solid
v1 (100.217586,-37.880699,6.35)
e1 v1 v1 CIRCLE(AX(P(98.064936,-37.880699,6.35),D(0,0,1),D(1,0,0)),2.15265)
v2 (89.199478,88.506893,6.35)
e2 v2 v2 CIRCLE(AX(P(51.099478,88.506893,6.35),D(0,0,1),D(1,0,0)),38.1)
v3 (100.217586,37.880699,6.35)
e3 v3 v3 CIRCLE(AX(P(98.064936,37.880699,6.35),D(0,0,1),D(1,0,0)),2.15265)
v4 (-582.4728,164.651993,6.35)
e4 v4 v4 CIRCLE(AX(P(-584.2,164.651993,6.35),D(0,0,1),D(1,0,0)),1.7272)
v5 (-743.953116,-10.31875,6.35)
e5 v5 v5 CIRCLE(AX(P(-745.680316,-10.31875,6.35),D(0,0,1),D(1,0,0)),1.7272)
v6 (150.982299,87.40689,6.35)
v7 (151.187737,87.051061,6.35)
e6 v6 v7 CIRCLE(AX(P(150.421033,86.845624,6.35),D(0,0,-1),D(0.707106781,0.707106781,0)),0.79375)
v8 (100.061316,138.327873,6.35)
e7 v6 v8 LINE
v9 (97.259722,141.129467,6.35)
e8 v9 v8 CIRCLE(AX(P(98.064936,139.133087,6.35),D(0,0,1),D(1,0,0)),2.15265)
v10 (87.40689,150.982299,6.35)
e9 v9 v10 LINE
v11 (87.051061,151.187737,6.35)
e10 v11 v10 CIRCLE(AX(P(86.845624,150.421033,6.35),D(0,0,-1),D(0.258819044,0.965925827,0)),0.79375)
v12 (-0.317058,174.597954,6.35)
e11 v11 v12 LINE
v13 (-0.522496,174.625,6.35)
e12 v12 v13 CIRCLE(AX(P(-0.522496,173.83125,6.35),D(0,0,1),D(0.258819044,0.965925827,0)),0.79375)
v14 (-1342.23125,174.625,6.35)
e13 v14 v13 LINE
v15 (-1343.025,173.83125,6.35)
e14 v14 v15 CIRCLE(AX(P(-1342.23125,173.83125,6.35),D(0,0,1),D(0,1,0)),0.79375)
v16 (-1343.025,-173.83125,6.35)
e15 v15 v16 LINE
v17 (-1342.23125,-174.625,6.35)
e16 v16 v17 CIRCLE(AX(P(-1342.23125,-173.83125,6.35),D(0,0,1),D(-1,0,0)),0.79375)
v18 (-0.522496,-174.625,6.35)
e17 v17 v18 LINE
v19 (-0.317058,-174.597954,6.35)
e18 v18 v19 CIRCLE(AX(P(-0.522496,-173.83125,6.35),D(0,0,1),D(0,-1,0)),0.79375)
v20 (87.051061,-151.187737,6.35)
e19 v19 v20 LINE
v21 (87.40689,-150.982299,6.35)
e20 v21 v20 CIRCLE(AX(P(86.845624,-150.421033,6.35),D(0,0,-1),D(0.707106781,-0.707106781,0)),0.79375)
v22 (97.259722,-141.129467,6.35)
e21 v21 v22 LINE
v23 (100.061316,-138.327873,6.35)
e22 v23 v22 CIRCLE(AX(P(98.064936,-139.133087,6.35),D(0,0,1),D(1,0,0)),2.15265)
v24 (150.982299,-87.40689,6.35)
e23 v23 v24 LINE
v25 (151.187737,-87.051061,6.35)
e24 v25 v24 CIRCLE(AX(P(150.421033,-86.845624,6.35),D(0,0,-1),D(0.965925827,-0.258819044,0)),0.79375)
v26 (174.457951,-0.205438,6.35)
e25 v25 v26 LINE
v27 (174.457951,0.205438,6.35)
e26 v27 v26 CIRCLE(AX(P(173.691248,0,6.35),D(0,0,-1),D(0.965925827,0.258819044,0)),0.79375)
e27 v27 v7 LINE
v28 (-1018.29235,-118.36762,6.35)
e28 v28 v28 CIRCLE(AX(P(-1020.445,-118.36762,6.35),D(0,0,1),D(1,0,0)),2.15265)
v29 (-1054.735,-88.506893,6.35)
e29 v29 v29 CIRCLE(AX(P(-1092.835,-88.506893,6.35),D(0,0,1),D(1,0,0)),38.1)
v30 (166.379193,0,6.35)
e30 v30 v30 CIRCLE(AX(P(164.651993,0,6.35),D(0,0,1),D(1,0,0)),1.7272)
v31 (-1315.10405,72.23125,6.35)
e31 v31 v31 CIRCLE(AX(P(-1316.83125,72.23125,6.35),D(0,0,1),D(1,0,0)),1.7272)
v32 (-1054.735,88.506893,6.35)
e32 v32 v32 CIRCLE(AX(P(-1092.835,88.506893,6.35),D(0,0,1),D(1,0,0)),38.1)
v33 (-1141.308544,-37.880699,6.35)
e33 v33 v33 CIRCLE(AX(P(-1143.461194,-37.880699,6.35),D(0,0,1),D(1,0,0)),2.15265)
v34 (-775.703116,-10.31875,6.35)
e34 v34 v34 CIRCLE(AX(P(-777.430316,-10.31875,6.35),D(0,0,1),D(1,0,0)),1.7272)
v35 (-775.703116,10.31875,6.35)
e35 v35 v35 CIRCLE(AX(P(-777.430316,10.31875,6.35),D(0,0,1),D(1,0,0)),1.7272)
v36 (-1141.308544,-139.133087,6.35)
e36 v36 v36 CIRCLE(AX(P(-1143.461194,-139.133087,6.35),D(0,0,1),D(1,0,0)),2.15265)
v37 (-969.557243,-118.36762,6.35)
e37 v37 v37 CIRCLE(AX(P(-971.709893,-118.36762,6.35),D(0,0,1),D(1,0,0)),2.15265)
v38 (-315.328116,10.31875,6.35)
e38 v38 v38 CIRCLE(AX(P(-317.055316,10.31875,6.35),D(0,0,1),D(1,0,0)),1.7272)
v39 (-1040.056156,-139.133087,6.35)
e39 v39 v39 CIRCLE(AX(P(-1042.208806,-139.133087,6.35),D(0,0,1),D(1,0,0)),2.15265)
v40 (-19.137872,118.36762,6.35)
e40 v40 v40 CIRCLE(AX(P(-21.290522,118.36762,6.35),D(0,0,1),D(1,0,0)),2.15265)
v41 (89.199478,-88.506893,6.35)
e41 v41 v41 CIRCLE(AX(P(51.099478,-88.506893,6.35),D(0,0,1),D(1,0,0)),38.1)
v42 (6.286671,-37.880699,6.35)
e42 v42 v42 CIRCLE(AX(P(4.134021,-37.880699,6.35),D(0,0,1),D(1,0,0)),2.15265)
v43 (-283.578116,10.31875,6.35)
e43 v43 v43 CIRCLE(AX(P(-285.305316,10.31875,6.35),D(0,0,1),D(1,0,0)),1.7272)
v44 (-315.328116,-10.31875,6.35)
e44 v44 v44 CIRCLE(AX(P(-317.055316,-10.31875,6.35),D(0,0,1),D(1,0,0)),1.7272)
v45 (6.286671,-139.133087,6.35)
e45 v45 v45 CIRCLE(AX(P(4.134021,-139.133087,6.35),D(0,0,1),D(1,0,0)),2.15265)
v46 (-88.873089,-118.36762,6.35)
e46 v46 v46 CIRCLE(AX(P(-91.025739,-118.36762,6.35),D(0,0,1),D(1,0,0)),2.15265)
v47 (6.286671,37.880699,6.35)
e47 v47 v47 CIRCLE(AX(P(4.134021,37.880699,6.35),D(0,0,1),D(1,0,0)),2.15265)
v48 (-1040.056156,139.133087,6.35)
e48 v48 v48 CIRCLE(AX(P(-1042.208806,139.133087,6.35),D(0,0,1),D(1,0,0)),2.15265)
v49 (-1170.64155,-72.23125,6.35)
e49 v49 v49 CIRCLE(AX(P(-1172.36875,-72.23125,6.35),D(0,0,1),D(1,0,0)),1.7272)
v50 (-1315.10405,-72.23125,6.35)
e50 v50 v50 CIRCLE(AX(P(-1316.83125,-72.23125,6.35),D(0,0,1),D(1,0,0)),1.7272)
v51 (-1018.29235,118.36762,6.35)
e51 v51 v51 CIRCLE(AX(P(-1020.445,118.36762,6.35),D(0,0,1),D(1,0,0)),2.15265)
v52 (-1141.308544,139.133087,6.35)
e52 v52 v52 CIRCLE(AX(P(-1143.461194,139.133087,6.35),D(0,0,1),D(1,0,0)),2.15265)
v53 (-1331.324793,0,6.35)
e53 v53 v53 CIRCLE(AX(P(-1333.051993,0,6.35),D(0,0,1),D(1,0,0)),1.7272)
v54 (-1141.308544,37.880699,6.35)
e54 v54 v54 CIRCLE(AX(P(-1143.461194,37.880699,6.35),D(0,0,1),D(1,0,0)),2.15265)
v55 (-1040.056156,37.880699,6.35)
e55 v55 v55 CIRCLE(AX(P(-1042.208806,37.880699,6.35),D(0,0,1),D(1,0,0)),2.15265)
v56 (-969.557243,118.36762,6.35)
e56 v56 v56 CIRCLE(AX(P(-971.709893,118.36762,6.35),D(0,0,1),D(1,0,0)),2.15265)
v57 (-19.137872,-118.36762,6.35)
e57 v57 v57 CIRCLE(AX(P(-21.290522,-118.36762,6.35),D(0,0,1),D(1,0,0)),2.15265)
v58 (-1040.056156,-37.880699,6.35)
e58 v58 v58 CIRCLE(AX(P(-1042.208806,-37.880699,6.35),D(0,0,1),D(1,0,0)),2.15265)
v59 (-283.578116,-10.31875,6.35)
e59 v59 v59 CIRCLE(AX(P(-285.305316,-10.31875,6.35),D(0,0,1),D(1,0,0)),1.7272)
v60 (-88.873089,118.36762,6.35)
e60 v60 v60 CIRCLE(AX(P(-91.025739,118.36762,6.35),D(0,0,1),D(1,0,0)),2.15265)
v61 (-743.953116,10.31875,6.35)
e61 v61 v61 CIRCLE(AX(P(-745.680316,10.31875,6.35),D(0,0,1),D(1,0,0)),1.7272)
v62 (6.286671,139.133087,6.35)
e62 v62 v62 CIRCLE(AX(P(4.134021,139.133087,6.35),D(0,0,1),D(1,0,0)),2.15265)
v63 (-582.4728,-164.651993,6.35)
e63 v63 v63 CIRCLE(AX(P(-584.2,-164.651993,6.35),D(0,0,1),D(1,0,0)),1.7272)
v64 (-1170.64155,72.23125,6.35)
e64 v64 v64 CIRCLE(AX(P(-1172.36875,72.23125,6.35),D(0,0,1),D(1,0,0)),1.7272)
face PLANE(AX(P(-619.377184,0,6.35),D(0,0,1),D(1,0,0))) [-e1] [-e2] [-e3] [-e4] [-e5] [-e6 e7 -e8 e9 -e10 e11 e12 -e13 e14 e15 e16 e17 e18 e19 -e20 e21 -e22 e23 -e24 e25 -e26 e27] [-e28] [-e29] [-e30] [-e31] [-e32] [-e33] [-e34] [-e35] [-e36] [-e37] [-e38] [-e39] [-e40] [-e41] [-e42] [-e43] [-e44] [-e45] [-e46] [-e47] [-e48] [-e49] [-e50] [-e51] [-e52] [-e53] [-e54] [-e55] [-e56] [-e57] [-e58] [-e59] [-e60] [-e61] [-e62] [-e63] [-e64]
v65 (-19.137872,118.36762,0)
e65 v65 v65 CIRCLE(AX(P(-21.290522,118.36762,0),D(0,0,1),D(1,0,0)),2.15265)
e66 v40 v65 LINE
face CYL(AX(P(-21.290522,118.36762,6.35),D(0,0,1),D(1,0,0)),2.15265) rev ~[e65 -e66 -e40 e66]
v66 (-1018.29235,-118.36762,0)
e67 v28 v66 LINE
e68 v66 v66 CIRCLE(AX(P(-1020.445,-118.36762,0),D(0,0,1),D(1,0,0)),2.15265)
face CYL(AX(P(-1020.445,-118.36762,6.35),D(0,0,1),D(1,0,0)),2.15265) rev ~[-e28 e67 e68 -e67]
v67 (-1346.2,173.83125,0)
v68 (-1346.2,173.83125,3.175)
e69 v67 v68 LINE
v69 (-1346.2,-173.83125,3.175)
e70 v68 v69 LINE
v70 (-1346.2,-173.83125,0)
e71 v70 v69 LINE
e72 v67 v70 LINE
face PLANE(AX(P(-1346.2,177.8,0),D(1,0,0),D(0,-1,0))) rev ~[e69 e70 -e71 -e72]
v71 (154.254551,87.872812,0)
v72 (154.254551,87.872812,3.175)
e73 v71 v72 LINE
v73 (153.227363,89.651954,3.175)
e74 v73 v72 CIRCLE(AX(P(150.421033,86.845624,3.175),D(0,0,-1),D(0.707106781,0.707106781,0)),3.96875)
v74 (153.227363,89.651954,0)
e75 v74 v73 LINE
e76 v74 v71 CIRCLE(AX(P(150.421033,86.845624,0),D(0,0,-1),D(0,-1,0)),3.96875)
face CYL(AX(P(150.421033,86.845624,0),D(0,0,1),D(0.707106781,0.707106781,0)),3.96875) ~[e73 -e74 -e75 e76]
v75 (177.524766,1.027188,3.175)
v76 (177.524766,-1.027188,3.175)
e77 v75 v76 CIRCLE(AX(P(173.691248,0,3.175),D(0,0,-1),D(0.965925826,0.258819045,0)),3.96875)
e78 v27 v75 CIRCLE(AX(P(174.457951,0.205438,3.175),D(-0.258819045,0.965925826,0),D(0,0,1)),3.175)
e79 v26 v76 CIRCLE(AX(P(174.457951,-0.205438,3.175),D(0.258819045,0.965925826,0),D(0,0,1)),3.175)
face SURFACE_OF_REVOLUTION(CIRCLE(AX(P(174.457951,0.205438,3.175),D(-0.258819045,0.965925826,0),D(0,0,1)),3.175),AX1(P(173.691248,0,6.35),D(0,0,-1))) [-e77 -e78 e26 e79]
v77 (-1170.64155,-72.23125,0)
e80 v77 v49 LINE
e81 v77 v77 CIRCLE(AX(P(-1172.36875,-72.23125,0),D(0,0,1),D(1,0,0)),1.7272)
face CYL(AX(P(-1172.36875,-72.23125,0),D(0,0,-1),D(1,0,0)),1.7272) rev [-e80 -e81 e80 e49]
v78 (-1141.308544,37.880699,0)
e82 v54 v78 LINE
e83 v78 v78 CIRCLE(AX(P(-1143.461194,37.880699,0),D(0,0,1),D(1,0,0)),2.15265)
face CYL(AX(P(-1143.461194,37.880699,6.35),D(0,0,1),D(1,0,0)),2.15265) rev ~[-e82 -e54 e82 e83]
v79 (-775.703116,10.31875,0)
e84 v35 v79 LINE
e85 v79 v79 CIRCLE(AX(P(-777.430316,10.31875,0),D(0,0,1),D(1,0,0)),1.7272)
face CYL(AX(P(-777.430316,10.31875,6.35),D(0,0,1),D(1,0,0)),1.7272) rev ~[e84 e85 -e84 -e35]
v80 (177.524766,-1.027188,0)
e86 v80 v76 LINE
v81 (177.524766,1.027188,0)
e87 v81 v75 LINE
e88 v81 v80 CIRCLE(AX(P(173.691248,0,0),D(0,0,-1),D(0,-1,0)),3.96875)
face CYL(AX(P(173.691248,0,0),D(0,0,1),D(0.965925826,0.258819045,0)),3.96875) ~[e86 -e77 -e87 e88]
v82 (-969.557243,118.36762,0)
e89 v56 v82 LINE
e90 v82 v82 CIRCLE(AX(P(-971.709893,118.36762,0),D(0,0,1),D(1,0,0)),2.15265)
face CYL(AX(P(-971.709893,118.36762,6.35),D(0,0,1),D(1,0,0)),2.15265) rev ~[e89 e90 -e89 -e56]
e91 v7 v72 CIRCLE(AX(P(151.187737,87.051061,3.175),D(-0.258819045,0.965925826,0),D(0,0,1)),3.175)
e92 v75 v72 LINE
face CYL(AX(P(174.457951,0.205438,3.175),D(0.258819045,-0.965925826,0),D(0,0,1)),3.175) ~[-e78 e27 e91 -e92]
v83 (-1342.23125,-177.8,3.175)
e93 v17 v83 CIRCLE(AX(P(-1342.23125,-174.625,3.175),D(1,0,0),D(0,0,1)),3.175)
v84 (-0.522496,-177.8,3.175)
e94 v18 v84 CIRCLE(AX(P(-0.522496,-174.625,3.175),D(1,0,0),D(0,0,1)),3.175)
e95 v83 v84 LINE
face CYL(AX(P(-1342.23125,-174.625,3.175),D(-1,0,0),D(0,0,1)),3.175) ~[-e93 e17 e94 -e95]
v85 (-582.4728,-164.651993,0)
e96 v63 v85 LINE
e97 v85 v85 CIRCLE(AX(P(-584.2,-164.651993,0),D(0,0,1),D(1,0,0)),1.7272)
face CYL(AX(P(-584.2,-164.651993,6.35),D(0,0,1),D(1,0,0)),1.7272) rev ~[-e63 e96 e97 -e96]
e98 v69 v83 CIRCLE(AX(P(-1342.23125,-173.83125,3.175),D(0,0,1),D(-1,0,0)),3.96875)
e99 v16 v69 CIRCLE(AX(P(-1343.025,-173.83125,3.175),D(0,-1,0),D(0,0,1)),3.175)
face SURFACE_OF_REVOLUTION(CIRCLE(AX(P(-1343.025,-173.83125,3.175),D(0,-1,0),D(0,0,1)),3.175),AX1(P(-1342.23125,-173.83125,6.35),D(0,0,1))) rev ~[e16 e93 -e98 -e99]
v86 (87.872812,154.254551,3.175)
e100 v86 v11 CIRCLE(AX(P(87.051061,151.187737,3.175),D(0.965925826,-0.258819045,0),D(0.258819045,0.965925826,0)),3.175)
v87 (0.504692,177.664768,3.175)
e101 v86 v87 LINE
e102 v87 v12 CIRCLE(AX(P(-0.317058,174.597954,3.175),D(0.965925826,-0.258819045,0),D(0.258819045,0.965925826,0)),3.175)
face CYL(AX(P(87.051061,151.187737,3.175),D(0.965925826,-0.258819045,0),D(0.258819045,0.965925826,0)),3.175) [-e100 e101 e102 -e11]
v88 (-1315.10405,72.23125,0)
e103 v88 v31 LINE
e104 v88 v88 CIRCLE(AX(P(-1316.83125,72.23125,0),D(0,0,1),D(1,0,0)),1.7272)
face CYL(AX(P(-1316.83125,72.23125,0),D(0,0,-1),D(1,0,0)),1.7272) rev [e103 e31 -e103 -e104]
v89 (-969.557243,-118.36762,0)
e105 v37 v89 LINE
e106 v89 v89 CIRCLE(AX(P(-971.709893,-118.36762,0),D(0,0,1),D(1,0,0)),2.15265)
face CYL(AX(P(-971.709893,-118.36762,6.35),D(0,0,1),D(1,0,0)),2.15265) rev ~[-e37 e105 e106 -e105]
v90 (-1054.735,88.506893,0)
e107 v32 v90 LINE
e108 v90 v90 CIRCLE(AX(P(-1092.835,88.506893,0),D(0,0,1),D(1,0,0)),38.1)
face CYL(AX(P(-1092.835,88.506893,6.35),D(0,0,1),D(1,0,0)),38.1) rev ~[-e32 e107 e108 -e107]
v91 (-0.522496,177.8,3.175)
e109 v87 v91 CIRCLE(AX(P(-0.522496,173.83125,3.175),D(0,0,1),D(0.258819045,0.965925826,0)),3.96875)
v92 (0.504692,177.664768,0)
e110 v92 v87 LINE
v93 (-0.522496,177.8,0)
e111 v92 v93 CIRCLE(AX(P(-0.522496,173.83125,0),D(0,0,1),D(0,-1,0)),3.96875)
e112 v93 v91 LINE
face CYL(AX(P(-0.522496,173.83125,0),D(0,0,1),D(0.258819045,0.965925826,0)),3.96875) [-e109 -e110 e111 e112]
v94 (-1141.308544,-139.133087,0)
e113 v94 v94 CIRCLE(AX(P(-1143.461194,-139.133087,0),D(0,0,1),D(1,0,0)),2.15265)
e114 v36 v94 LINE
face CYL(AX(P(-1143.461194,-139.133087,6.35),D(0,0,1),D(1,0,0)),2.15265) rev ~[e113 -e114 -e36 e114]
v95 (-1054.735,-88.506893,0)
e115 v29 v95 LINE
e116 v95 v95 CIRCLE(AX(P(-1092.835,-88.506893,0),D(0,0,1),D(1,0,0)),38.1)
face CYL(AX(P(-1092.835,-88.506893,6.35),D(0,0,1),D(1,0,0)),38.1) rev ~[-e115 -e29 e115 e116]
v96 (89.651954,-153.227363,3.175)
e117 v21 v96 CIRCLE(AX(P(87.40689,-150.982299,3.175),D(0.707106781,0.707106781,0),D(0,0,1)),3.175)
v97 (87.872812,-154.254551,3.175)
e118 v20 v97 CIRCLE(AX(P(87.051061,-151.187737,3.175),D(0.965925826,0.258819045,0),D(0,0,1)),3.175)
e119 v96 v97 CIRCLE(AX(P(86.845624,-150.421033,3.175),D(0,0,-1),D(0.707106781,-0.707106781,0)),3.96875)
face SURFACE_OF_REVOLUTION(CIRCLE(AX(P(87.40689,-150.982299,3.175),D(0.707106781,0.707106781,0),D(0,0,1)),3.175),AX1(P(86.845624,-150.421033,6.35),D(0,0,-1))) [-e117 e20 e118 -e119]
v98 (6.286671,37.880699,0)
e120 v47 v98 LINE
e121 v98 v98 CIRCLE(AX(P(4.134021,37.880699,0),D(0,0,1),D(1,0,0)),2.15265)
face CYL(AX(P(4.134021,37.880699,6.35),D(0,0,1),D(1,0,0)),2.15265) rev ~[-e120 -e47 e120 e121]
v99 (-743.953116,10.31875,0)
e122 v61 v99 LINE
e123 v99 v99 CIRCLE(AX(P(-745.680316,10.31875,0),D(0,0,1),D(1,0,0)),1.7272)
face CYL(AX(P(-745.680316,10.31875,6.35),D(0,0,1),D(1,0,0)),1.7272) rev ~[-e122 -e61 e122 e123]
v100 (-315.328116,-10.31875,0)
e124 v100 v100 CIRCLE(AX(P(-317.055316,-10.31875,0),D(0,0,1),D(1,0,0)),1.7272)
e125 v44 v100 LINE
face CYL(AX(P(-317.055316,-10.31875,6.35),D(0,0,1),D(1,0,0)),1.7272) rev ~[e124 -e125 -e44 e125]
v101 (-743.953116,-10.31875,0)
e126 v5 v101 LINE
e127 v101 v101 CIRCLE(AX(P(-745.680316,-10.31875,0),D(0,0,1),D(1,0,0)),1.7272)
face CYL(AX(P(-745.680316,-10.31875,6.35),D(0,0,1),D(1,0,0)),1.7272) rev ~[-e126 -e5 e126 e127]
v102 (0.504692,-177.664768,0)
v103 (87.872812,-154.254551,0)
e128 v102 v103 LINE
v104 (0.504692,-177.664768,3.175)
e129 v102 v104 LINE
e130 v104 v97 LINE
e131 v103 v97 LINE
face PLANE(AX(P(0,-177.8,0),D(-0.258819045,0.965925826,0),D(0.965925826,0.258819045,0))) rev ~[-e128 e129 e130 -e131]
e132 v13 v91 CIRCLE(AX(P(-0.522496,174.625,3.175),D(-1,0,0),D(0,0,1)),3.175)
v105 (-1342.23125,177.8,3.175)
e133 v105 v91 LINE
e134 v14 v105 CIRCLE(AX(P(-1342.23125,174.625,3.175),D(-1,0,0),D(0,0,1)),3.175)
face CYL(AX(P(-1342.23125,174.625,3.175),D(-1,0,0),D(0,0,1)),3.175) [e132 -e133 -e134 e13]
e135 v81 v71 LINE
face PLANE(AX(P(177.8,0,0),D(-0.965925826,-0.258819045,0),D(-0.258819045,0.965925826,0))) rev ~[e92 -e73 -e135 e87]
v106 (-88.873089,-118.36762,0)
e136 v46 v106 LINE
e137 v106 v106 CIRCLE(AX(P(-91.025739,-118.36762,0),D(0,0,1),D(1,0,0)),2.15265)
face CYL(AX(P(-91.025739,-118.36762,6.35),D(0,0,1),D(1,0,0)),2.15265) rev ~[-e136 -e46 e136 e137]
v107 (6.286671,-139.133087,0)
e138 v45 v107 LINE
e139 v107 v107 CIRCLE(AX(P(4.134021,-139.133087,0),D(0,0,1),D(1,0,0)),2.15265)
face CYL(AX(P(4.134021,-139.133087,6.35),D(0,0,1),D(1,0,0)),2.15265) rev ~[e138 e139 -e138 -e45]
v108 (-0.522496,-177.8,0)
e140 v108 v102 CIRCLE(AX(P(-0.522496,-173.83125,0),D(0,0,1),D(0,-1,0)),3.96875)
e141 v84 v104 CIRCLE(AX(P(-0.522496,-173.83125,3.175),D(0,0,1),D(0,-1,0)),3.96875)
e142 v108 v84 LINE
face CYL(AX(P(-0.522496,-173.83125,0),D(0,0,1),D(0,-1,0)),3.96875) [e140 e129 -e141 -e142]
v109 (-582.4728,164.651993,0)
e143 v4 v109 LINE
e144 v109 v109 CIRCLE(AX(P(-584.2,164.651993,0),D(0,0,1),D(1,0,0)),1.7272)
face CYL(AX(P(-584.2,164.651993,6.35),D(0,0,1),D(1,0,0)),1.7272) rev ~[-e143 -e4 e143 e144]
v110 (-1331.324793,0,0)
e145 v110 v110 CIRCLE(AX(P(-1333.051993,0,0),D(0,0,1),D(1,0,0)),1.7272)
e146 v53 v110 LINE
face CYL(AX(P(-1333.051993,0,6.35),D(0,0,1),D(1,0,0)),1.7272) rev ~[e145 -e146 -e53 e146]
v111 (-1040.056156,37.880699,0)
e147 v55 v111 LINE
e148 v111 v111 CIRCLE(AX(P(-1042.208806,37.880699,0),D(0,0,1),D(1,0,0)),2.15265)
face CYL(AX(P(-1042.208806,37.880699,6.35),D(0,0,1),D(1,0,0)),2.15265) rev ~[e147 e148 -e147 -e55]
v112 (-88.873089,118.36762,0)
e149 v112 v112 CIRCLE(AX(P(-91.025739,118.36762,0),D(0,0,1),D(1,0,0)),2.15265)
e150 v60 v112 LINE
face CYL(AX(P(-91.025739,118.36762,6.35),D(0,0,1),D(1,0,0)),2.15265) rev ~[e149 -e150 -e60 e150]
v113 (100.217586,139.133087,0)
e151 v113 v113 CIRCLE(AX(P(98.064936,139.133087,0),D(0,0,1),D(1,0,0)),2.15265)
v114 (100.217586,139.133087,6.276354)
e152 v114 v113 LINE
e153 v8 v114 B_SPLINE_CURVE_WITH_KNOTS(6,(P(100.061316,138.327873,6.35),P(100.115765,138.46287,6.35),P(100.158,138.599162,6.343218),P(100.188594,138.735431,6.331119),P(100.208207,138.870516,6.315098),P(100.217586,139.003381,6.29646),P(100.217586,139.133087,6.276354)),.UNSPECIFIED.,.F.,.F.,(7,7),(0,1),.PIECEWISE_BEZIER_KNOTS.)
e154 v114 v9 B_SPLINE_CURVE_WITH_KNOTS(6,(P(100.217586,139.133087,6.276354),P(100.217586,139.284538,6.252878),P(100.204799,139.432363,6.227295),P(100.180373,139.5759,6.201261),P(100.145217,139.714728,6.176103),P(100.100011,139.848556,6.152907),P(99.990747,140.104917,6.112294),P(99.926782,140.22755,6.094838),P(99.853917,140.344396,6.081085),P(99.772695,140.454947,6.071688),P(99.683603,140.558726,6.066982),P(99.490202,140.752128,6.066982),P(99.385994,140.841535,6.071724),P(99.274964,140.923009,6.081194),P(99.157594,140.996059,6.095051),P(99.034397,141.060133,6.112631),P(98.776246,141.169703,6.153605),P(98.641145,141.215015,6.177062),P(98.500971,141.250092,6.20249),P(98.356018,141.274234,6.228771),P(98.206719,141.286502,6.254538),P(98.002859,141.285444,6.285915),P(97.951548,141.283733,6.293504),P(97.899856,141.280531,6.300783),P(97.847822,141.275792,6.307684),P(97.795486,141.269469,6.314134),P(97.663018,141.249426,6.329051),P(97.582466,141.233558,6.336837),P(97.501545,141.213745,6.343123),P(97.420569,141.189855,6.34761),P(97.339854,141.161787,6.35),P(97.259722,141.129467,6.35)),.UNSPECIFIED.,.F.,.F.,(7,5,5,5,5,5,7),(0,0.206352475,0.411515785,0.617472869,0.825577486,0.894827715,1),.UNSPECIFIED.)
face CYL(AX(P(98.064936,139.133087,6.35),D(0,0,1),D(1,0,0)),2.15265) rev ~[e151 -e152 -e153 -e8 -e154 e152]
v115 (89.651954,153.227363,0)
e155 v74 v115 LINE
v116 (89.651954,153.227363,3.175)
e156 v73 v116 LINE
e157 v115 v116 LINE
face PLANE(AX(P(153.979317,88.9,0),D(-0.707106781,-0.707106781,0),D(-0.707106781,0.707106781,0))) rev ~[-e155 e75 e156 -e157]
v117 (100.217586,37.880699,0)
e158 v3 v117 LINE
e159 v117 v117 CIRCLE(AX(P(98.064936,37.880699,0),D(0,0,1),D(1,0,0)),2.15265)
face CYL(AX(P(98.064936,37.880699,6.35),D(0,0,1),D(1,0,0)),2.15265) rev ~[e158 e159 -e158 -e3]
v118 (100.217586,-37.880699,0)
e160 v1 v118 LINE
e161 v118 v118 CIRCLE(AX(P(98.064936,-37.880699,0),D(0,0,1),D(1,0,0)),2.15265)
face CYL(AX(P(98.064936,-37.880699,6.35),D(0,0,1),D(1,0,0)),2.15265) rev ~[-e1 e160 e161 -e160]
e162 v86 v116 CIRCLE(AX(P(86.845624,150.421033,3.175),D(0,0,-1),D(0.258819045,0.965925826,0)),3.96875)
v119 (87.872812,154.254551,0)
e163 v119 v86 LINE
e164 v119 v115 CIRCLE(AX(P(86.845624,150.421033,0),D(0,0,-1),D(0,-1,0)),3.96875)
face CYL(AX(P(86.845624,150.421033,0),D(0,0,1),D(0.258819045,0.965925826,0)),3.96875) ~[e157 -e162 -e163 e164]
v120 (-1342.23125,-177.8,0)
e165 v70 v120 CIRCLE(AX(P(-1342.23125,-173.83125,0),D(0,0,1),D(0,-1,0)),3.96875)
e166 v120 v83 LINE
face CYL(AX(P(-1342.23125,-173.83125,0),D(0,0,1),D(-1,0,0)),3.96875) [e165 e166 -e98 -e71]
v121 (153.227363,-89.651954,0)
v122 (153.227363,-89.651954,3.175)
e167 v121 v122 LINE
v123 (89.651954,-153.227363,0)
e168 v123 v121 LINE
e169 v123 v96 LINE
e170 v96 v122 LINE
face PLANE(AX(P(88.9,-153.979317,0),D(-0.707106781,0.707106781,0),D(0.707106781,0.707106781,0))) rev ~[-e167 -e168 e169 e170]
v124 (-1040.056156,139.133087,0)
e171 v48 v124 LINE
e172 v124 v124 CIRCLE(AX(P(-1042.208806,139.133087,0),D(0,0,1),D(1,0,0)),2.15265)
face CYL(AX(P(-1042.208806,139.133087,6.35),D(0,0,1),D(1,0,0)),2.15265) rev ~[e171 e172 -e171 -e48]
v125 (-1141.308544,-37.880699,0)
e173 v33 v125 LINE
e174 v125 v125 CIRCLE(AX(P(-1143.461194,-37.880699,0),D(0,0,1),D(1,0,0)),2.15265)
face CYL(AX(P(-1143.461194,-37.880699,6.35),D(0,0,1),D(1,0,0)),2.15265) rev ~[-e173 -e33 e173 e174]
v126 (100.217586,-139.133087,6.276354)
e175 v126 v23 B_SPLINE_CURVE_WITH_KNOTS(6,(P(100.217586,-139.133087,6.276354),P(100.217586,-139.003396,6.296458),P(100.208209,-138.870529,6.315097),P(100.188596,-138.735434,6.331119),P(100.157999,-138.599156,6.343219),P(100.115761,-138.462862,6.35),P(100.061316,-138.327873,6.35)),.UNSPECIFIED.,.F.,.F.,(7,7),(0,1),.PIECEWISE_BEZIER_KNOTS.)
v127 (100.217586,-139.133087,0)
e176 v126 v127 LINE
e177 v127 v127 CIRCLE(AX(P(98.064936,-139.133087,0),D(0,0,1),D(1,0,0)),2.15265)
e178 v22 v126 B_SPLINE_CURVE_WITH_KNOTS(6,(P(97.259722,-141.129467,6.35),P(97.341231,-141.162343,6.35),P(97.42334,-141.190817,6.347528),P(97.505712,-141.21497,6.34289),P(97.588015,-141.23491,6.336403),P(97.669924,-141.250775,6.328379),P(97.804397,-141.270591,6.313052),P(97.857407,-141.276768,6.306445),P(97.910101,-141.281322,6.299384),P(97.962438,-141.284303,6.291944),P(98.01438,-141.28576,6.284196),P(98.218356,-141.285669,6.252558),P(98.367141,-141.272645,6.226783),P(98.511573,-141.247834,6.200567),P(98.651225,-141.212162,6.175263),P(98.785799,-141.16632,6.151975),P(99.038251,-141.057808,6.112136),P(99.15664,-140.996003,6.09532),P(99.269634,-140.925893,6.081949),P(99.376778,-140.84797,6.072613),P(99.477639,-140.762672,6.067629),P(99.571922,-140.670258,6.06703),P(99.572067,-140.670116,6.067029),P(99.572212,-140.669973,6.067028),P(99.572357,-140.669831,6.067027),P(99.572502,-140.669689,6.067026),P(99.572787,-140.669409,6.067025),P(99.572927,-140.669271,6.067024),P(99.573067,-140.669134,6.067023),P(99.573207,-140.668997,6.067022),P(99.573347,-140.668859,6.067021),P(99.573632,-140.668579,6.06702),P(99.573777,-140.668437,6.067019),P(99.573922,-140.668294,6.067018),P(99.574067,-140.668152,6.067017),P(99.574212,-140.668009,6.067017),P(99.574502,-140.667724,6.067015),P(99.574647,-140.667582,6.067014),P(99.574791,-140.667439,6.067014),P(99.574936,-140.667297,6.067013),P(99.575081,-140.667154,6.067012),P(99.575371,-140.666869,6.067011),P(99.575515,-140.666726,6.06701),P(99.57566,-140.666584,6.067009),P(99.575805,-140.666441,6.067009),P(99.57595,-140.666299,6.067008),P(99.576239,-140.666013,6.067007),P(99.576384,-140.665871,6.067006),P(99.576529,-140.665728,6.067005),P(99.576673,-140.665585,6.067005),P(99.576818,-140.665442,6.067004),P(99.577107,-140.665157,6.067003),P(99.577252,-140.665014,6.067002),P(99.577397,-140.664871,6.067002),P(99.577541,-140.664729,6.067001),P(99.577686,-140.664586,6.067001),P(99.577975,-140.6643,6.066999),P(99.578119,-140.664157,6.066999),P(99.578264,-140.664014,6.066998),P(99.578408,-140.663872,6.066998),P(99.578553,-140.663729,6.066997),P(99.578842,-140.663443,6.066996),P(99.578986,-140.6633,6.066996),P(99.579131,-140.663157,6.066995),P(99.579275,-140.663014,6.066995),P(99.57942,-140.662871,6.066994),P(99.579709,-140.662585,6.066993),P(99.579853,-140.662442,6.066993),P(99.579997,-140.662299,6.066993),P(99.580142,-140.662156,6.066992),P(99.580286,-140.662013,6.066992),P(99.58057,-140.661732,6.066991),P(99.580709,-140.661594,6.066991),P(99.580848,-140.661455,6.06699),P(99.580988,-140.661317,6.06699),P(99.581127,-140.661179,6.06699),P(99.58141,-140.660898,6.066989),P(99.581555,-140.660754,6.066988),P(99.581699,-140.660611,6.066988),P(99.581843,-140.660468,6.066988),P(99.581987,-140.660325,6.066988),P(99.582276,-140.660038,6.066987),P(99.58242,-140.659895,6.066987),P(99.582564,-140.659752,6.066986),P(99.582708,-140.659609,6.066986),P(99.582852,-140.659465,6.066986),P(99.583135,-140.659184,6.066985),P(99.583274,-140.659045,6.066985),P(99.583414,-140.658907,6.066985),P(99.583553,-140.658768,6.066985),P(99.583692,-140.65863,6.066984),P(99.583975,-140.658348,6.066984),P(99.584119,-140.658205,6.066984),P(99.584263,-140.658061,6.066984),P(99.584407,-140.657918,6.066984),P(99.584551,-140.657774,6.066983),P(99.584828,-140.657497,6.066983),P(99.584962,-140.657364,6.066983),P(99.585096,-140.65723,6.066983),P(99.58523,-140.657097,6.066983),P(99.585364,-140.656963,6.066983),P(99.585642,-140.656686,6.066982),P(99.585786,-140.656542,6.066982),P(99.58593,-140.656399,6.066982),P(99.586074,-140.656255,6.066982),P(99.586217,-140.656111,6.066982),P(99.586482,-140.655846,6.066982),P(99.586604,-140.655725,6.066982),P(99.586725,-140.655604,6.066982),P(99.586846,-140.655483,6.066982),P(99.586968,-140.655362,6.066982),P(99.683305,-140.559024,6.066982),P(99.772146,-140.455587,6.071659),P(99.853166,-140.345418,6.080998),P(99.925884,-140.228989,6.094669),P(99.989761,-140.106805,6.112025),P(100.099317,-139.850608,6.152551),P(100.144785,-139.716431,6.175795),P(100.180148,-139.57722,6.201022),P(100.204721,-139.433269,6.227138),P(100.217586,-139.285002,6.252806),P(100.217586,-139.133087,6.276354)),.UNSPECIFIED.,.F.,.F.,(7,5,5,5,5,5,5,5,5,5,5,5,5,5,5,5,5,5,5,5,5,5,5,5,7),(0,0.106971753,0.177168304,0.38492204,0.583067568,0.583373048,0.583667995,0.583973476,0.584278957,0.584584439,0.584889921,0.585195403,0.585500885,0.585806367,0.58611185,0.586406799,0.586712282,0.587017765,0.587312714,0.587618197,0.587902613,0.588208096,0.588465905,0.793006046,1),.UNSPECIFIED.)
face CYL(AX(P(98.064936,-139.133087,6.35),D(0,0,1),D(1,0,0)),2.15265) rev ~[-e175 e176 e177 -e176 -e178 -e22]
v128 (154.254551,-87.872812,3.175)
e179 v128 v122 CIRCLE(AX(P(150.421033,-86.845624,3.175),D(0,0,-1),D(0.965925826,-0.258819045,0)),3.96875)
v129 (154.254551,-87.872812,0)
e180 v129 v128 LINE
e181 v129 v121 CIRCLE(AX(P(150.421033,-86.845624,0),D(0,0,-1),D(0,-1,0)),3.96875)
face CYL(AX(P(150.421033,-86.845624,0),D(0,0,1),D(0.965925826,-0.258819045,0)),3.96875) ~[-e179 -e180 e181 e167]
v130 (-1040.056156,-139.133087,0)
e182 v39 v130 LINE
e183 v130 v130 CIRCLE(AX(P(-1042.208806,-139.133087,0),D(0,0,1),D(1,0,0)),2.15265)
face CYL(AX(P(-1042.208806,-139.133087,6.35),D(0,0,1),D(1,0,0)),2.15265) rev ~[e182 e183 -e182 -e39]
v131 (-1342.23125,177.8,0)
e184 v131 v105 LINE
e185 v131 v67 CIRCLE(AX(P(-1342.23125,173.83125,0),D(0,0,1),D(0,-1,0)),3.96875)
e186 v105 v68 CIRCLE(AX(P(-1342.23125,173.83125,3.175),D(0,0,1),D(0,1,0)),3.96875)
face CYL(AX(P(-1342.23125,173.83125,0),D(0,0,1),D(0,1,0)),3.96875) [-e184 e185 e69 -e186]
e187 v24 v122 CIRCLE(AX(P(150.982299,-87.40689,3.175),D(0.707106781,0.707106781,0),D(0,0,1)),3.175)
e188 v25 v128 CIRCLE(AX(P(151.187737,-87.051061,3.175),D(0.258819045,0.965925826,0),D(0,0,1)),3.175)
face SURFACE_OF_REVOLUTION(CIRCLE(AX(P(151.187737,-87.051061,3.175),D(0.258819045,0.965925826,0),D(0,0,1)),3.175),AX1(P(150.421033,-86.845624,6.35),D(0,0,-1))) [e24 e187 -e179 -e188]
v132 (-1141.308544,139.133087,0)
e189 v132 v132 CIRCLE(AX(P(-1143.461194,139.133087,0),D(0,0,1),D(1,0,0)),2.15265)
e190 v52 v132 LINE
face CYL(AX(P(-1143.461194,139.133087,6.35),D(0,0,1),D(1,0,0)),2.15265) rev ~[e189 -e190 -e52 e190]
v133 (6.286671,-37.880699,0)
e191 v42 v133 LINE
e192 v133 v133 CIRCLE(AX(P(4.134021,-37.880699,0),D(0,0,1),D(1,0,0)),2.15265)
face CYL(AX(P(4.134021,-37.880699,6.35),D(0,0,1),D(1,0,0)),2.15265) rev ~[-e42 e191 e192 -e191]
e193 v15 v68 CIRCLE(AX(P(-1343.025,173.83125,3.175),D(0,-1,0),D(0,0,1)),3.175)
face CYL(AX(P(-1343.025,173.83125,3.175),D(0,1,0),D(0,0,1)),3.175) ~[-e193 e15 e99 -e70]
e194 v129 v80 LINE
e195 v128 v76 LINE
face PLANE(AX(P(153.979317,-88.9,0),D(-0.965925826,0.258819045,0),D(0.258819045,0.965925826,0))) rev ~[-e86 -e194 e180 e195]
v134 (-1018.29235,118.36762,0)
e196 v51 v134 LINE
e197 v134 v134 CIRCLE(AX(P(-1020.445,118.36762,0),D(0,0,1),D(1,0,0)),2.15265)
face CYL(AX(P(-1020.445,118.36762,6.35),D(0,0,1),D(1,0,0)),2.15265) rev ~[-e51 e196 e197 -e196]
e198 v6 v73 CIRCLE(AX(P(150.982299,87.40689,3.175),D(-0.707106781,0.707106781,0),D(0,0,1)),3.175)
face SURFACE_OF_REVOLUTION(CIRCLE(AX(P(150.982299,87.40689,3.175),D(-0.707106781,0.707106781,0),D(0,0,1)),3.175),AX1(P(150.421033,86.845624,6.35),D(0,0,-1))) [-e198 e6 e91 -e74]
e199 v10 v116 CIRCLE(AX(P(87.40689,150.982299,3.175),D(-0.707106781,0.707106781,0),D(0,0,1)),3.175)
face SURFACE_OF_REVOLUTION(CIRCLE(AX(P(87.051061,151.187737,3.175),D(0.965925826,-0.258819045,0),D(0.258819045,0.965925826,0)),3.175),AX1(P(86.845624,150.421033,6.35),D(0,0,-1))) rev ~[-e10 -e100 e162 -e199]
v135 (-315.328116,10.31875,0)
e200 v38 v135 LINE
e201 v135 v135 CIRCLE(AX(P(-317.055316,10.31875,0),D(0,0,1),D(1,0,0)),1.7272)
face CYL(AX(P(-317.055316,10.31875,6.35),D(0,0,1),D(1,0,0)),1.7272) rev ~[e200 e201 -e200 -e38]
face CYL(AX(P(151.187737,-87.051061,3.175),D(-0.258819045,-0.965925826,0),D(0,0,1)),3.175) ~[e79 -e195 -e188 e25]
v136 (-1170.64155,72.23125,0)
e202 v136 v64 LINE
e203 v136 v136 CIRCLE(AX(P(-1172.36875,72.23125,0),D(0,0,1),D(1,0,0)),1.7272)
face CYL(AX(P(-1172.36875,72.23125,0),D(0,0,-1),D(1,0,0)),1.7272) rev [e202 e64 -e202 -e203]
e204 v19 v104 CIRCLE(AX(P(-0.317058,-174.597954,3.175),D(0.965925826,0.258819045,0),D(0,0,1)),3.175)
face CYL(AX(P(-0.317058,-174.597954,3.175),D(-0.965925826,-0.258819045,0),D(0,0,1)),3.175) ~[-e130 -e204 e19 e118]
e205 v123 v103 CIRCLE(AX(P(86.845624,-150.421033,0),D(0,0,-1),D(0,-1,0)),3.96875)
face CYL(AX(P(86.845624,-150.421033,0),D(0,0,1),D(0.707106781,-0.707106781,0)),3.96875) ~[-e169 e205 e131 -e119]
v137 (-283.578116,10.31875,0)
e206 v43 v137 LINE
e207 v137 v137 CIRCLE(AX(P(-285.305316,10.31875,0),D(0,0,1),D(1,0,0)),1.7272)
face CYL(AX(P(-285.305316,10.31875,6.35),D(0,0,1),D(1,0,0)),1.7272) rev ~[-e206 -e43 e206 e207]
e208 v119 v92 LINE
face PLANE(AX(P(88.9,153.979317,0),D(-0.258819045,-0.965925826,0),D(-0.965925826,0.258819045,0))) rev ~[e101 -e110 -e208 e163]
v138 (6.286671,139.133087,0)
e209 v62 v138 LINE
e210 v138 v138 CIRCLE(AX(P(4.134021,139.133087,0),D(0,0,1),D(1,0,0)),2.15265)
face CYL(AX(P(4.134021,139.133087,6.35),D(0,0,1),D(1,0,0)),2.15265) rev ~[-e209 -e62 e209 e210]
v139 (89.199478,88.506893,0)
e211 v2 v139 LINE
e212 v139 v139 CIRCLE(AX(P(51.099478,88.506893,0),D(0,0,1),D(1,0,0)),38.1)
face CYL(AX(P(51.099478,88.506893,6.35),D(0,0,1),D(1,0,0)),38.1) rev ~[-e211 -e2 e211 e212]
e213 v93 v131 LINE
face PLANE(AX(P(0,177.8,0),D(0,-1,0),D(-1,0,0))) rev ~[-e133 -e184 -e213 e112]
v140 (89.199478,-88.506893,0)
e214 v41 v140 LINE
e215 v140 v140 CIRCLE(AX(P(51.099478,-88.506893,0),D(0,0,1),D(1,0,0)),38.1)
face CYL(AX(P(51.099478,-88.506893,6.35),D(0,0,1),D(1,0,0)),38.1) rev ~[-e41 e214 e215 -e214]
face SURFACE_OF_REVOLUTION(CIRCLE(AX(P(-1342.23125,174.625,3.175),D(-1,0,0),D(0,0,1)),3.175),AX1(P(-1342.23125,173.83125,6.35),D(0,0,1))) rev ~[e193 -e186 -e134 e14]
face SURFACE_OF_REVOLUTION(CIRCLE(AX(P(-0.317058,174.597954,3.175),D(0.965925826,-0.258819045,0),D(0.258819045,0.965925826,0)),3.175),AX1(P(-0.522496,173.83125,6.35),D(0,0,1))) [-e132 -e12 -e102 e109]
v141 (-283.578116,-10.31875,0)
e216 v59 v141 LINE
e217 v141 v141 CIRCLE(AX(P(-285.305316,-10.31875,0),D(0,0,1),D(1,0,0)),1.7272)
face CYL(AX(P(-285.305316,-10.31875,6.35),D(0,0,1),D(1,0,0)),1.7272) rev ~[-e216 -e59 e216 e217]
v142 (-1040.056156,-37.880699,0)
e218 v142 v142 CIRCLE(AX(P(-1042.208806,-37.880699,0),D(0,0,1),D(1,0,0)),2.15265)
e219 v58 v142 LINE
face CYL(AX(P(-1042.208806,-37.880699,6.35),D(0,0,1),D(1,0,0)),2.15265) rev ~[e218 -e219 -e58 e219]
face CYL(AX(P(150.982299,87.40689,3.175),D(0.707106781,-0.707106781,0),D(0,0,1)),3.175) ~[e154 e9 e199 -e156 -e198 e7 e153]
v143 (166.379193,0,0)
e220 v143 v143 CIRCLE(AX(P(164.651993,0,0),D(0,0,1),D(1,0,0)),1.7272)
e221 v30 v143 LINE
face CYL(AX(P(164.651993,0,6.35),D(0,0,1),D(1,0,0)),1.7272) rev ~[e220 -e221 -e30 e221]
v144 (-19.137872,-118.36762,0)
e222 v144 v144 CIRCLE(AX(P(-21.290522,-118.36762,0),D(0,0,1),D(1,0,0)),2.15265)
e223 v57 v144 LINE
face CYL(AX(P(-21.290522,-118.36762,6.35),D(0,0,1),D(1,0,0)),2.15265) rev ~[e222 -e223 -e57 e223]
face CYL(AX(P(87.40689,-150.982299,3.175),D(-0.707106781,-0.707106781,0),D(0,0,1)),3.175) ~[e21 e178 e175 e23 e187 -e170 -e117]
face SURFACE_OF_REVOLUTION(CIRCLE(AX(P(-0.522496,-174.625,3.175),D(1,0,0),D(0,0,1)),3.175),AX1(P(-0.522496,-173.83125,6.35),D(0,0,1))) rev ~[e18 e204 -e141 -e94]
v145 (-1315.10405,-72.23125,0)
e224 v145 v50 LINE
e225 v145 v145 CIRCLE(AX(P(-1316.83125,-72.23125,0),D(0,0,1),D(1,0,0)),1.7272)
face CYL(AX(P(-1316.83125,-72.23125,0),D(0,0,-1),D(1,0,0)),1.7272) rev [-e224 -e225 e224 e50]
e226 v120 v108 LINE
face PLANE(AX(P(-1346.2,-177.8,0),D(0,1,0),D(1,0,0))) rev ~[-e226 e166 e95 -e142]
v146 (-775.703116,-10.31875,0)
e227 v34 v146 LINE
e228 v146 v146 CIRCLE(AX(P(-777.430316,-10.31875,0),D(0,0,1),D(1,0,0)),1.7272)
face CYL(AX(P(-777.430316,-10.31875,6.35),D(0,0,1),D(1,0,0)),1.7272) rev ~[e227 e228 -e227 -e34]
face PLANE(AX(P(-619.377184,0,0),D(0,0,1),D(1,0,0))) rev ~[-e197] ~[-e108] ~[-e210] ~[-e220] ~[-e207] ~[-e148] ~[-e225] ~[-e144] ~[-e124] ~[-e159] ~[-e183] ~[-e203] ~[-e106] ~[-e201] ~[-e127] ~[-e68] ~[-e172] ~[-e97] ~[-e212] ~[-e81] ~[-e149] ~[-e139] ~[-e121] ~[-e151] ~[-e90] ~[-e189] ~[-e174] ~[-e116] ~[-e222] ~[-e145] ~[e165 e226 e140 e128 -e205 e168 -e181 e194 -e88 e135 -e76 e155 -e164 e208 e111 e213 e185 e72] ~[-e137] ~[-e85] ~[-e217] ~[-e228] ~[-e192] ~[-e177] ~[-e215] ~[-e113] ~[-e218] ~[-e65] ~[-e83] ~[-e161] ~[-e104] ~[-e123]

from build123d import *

# Parameters (mm, degrees)
F0_R         = 1.7272
F1_DEPTH     = 6.35
F2_R         = 1.7272
F2_R_2       = 38.1
F2_R_3       = 2.15265
F3_DEPTH     = 6.35
F4_R         = 1.7272
F4_R_2       = 2.15265
F5_DEPTH     = 6.35
F6_R         = 3.96875
F7_T1_DEPTH  = 90.4501332312
F7_T3_DEPTH  = 89.9092057235
F7_T5_DEPTH  = 1341.7087541502
F7_T7_DEPTH  = 89.9092057235
F7_T9_DEPTH  = 347.6625
F7_T11_DEPTH = 89.9092057235
F7_T13_DEPTH = 89.9092057235
F7_T15_DEPTH = 90.4501332312
F7_T18_ANGLE = 90
F7_T20_ANGLE = 30
F7_T22_ANGLE = 15
F7_T24_ANGLE = 30
F7_T26_ANGLE = 90
F7_T28_ANGLE = 30
F7_T30_ANGLE = 30
F7_T32_ANGLE = 15
F7_T34_ANGLE = 30


# Not quite as in the source:
# - a fillet or chamfer that OpenCascade refuses, or shapes differently, is made with other operations: its cross-section is extruded or revolved along the edge and cut away or added


with BuildPart() as f1:
    # F0 (on Top) → F1 (new body)
    with BuildSketch(Plane.XY):
        Polygon((88.9, 153.9793167929), (0, 177.8), (-1346.2, 177.8), (-1346.2, -177.8), (0, -177.8), (88.9, -153.9793167929), (153.9793167929, -88.9), (177.8, 0), (153.9793167929, 88.9), align=None)
        with Locations((-1316.83125, -72.23125)):
            Circle(F0_R, mode=Mode.SUBTRACT)
        with Locations((-1172.36875, -72.23125)):
            Circle(F0_R, mode=Mode.SUBTRACT)
        with Locations((-1316.83125, 72.23125)):
            Circle(F0_R, mode=Mode.SUBTRACT)
        with Locations((-1172.36875, 72.23125)):
            Circle(F0_R, mode=Mode.SUBTRACT)
    extrude(amount=F1_DEPTH)

    # F2 (on face) → F3 (cut, through all)
    with BuildSketch(Plane.XY.offset(6.35)):
        with Locations((-1333.0519925088, 0)):
            Circle(F2_R)
        with Locations((-584.2, 164.6519925088)):
            Circle(F2_R)
        with Locations((-584.2, -164.6519925088)):
            Circle(F2_R)
        with Locations((164.6519925088, 0)):
            Circle(F2_R)
        with Locations((51.0994784628, 88.5068929378)):
            Circle(F2_R_2)
        with Locations((51.0994784628, -88.5068929378)):
            Circle(F2_R_2)
        with Locations((-1092.835, 88.5068929378)):
            Circle(F2_R_2)
        with Locations((-1092.835, -88.5068929378)):
            Circle(F2_R_2)
        with Locations((4.1340214009, -139.1330868203)):
            Circle(F2_R_3)
        with Locations((98.0649355247, -139.1330868203)):
            Circle(F2_R_3)
        with Locations((98.0649355247, -37.8806990553)):
            Circle(F2_R_3)
        with Locations((4.1340214009, -37.8806990553)):
            Circle(F2_R_3)
        with Locations((4.1340214009, 37.8806990553)):
            Circle(F2_R_3)
        with Locations((4.1340214009, 139.1330868203)):
            Circle(F2_R_3)
        with Locations((98.0649355247, 139.1330868203)):
            Circle(F2_R_3)
        with Locations((98.0649355247, 37.8806990553)):
            Circle(F2_R_3)
        with Locations((-1143.4611938825, -139.1330868203)):
            Circle(F2_R_3)
        with Locations((-1042.2088061175, -139.1330868203)):
            Circle(F2_R_3)
        with Locations((-1042.2088061175, -37.8806990553)):
            Circle(F2_R_3)
        with Locations((-1143.4611938825, -37.8806990553)):
            Circle(F2_R_3)
        with Locations((-1143.4611938825, 37.8806990553)):
            Circle(F2_R_3)
        with Locations((-1042.2088061175, 37.8806990553)):
            Circle(F2_R_3)
        with Locations((-1042.2088061175, 139.1330868203)):
            Circle(F2_R_3)
        with Locations((-1143.4611938825, 139.1330868203)):
            Circle(F2_R_3)
    extrude(amount=-F3_DEPTH, mode=Mode.SUBTRACT)

    # F4 (on face) → F5 (cut, through all)
    with BuildSketch(Plane.XY.offset(6.35)):
        with Locations((-285.3053159686, -10.31875)):
            Circle(F4_R)
        with Locations((-317.0553159686, -10.31875)):
            Circle(F4_R)
        with Locations((-317.0553159686, 10.31875)):
            Circle(F4_R)
        with Locations((-285.3053159686, 10.31875)):
            Circle(F4_R)
        with Locations((-745.6803159686, 10.31875)):
            Circle(F4_R)
        with Locations((-745.6803159686, -10.31875)):
            Circle(F4_R)
        with Locations((-777.4303159686, -10.31875)):
            Circle(F4_R)
        with Locations((-777.4303159686, 10.31875)):
            Circle(F4_R)
        with Locations((-21.2905215372, 118.3676195)):
            Circle(F4_R_2)
        with Locations((-91.0257389372, 118.3676195)):
            Circle(F4_R_2)
        with Locations((-91.0257389372, -118.3676195)):
            Circle(F4_R_2)
        with Locations((-21.2905215372, -118.3676195)):
            Circle(F4_R_2)
        with Locations((-1020.445, -118.3676195)):
            Circle(F4_R_2)
        with Locations((-971.709893, -118.3676195)):
            Circle(F4_R_2)
        with Locations((-1020.445, 118.3676195)):
            Circle(F4_R_2)
        with Locations((-971.709893, 118.3676195)):
            Circle(F4_R_2)
    extrude(amount=-F5_DEPTH, mode=Mode.SUBTRACT)

    # F6
    f6_edges = [f1.edges().sort_by_distance(p)[0] for p in [
        (0, -177.8, 3.175),
        (88.9, -153.979317, 3.175),
        (153.979317, -88.9, 3.175),
        (177.8, 0, 3.175),
        (153.979317, 88.9, 3.175),
        (88.9, 153.979317, 3.175),
        (0, 177.8, 3.175),
        (-1346.2, 177.8, 3.175),
        (-1346.2, -177.8, 3.175),
    ]]
    fillet(f6_edges, radius=F6_R)

    # F7: fillet of radius 3.175 on 18 edges, made by hand

    # F7_s2 → F7_t1 (cut)
    with BuildSketch(Plane(origin=(43.4228119147, -11.6351073856, 0), x_dir=(0, 0, 1), z_dir=(-0.9659258263, 0.2588190451, 0))):
        with BuildLine():
            ThreePointArc((3.175, 171.7416119142), (5.4200640303, 170.8116759445), (6.35, 168.5666119142))
            Line((6.35, 168.5666119142), (6.35, 171.7416119142))
            Line((6.35, 171.7416119142), (3.175, 171.7416119142))
        make_face()
    extrude(amount=F7_T1_DEPTH, mode=Mode.SUBTRACT)

    # F7_s4 → F7_t3 (cut)
    with BuildSketch(Plane(origin=(31.7877045291, -31.7877045291, 0), x_dir=(0, 0, 1), z_dir=(-0.7071067812, 0.7071067812, 0))):
        with BuildLine():
            ThreePointArc((6.35, 168.5666119142), (5.4200640303, 170.8116759445), (3.175, 171.7416119142))
            Line((3.175, 171.7416119142), (6.35, 171.7416119142))
            Line((6.35, 171.7416119142), (6.35, 168.5666119142))
        make_face()
    extrude(amount=F7_T3_DEPTH, mode=Mode.SUBTRACT)

    # F7_s6 → F7_t5 (cut)
    with BuildSketch(Plane.YZ.offset(-1342.23125)):
        with BuildLine():
            ThreePointArc((174.625, 6.35), (176.8700640303, 5.4200640303), (177.8, 3.175))
            Line((177.8, 3.175), (177.8, 6.35))
            Line((177.8, 6.35), (174.625, 6.35))
        make_face()
        with BuildLine():
            ThreePointArc((-174.625, 6.35), (-176.8700640303, 5.4200640303), (-177.8, 3.175))
            Line((-177.8, 3.175), (-177.8, 6.35))
            Line((-177.8, 6.35), (-174.625, 6.35))
        make_face()
    extrude(amount=F7_T5_DEPTH, mode=Mode.SUBTRACT)

    # F7_s8 → F7_t7 (cut)
    with BuildSketch(Plane(origin=(11.6351073856, -43.4228119147, 0), x_dir=(0, 0, 1), z_dir=(-0.2588190451, 0.9659258263, 0))):
        with BuildLine():
            ThreePointArc((6.35, 168.5666119142), (5.4200640303, 170.8116759445), (3.175, 171.7416119142))
            Line((3.175, 171.7416119142), (6.35, 171.7416119142))
            Line((6.35, 171.7416119142), (6.35, 168.5666119142))
        make_face()
    extrude(amount=F7_T7_DEPTH, mode=Mode.SUBTRACT)

    # F7_s10 → F7_t9 (cut)
    with BuildSketch(Plane.XZ.offset(-173.83125)):
        with BuildLine():
            ThreePointArc((-1343.025, 6.35), (-1345.2700640303, 5.4200640303), (-1346.2, 3.175))
            Line((-1346.2, 3.175), (-1346.2, 6.35))
            Line((-1346.2, 6.35), (-1343.025, 6.35))
        make_face()
    extrude(amount=F7_T9_DEPTH, mode=Mode.SUBTRACT)

    # F7_s12 → F7_t11 (cut)
    with BuildSketch(Plane(origin=(-11.6351073856, -43.4228119147, 0), x_dir=(0, 0, 1), z_dir=(0.2588190451, 0.9659258263, 0))):
        with BuildLine():
            ThreePointArc((6.35, 168.5666119142), (5.4200640303, 170.8116759445), (3.175, 171.7416119142))
            Line((3.175, 171.7416119142), (6.35, 171.7416119142))
            Line((6.35, 171.7416119142), (6.35, 168.5666119142))
        make_face()
    extrude(amount=F7_T11_DEPTH, mode=Mode.SUBTRACT)

    # F7_s14 → F7_t13 (cut)
    with BuildSketch(Plane(origin=(-31.7877045291, -31.7877045291, 0), x_dir=(0, 0, 1), z_dir=(0.7071067812, 0.7071067812, 0))):
        with BuildLine():
            ThreePointArc((6.35, 168.5666119142), (5.4200640303, 170.8116759445), (3.175, 171.7416119142))
            Line((3.175, 171.7416119142), (6.35, 171.7416119142))
            Line((6.35, 171.7416119142), (6.35, 168.5666119142))
        make_face()
    extrude(amount=F7_T13_DEPTH, mode=Mode.SUBTRACT)

    # F7_s16 → F7_t15 (cut)
    with BuildSketch(Plane(origin=(-43.9453077645, -11.7751097266, 0), x_dir=(0, 0, 1), z_dir=(0.9659258263, 0.2588190451, 0))):
        with BuildLine():
            ThreePointArc((6.35, 168.5666119142), (5.4200640303, 170.8116759445), (3.175, 171.7416119142))
            Line((3.175, 171.7416119142), (6.35, 171.7416119142))
            Line((6.35, 171.7416119142), (6.35, 168.5666119142))
        make_face()
    extrude(amount=F7_T15_DEPTH, mode=Mode.SUBTRACT)

    # F7_s17 → F7_t18 (revolve, cut)
    with BuildSketch(Plane.XZ.offset(173.83125)):
        with BuildLine():
            ThreePointArc((-1343.025, 6.35), (-1345.2700640303, 5.4200640303), (-1346.2, 3.175))
            Line((-1346.2, 3.175), (-1346.2, 6.35))
            Line((-1346.2, 6.35), (-1343.025, 6.35))
        make_face()
    revolve(axis=Axis((-1342.23125, -173.83125, 6.35), (0, 0, 1)), revolution_arc=F7_T18_ANGLE, mode=Mode.SUBTRACT)

    # F7_s19 → F7_t20 (revolve, cut)
    with BuildSketch(Plane(origin=(43.4228119147, -11.6351073856, 0), x_dir=(0, 0, 1), z_dir=(-0.9659258263, 0.2588190451, 0))):
        with BuildLine():
            ThreePointArc((3.175, 171.7416119142), (5.4200640303, 170.8116759445), (6.35, 168.5666119142))
            Line((6.35, 168.5666119142), (6.35, 171.7416119142))
            Line((6.35, 171.7416119142), (3.175, 171.7416119142))
        make_face()
    revolve(axis=Axis((86.8456238295, 150.4210328877, 6.35), (0, 0, -1)), revolution_arc=F7_T20_ANGLE, mode=Mode.SUBTRACT)

    # F7_s21 → F7_t22 (revolve, cut)
    with BuildSketch(Plane(origin=(-43.9453077646, 11.7751097266, 0), x_dir=(0, 0, 1), z_dir=(0.9659258263, -0.2588190451, 0))):
        with BuildLine():
            ThreePointArc((3.175, -171.7416119142), (5.4200640303, -170.8116759445), (6.35, -168.5666119142))
            Line((6.35, -168.5666119142), (6.35, -171.7416119142))
            Line((6.35, -171.7416119142), (3.175, -171.7416119142))
        make_face()
    revolve(axis=Axis((-0.5224958498, 173.83125, 6.35), (0, 0, 1)), revolution_arc=F7_T22_ANGLE, mode=Mode.SUBTRACT)

    # F7_s23 → F7_t24 (revolve, cut)
    with BuildSketch(Plane(origin=(31.7877045291, -31.7877045291, 0), x_dir=(0, 0, 1), z_dir=(-0.7071067812, 0.7071067812, 0))):
        with BuildLine():
            ThreePointArc((6.35, 168.5666119142), (5.4200640303, 170.8116759445), (3.175, 171.7416119142))
            Line((3.175, 171.7416119142), (6.35, 171.7416119142))
            Line((6.35, 171.7416119142), (6.35, 168.5666119142))
        make_face()
    revolve(axis=Axis((150.4210328877, 86.8456238295, 6.35), (0, 0, -1)), revolution_arc=F7_T24_ANGLE, mode=Mode.SUBTRACT)

    # F7_s25 → F7_t26 (revolve, cut)
    with BuildSketch(Plane.YZ.offset(-1342.23125)):
        with BuildLine():
            ThreePointArc((174.625, 6.35), (176.8700640303, 5.4200640303), (177.8, 3.175))
            Line((177.8, 3.175), (177.8, 6.35))
            Line((177.8, 6.35), (174.625, 6.35))
        make_face()
    revolve(axis=Axis((-1342.23125, 173.83125, 6.35), (0, 0, 1)), revolution_arc=F7_T26_ANGLE, mode=Mode.SUBTRACT)

    # F7_s27 → F7_t28 (revolve, cut)
    with BuildSketch(Plane(origin=(11.6351073856, -43.4228119147, 0), x_dir=(0, 0, 1), z_dir=(-0.2588190451, 0.9659258263, 0))):
        with BuildLine():
            ThreePointArc((6.35, 168.5666119142), (5.4200640303, 170.8116759445), (3.175, 171.7416119142))
            Line((3.175, 171.7416119142), (6.35, 171.7416119142))
            Line((6.35, 171.7416119142), (6.35, 168.5666119142))
        make_face()
    revolve(axis=Axis((173.691247659, 0, 6.35), (0, 0, -1)), revolution_arc=F7_T28_ANGLE, mode=Mode.SUBTRACT)

    # F7_s29 → F7_t30 (revolve, cut)
    with BuildSketch(Plane(origin=(-11.6351073856, -43.4228119147, 0), x_dir=(0, 0, 1), z_dir=(0.2588190451, 0.9659258263, 0))):
        with BuildLine():
            ThreePointArc((6.35, 168.5666119142), (5.4200640303, 170.8116759445), (3.175, 171.7416119142))
            Line((3.175, 171.7416119142), (6.35, 171.7416119142))
            Line((6.35, 171.7416119142), (6.35, 168.5666119142))
        make_face()
    revolve(axis=Axis((150.4210328877, -86.8456238295, 6.35), (0, 0, -1)), revolution_arc=F7_T30_ANGLE, mode=Mode.SUBTRACT)

    # F7_s31 → F7_t32 (revolve, cut)
    with BuildSketch(Plane.YZ.offset(-0.5224958498)):
        with BuildLine():
            ThreePointArc((-174.625, 6.35), (-176.8700640303, 5.4200640303), (-177.8, 3.175))
            Line((-177.8, 3.175), (-177.8, 6.35))
            Line((-177.8, 6.35), (-174.625, 6.35))
        make_face()
    revolve(axis=Axis((-0.5224958498, -173.83125, 6.35), (0, 0, 1)), revolution_arc=F7_T32_ANGLE, mode=Mode.SUBTRACT)

    # F7_s33 → F7_t34 (revolve, cut)
    with BuildSketch(Plane(origin=(-31.7877045291, -31.7877045291, 0), x_dir=(0, 0, 1), z_dir=(0.7071067812, 0.7071067812, 0))):
        with BuildLine():
            ThreePointArc((6.35, 168.5666119142), (5.4200640303, 170.8116759445), (3.175, 171.7416119142))
            Line((3.175, 171.7416119142), (6.35, 171.7416119142))
            Line((6.35, 171.7416119142), (6.35, 168.5666119142))
        make_face()
    revolve(axis=Axis((86.8456238295, -150.4210328877, 6.35), (0, 0, -1)), revolution_arc=F7_T34_ANGLE, mode=Mode.SUBTRACT)


solid = f1.part
